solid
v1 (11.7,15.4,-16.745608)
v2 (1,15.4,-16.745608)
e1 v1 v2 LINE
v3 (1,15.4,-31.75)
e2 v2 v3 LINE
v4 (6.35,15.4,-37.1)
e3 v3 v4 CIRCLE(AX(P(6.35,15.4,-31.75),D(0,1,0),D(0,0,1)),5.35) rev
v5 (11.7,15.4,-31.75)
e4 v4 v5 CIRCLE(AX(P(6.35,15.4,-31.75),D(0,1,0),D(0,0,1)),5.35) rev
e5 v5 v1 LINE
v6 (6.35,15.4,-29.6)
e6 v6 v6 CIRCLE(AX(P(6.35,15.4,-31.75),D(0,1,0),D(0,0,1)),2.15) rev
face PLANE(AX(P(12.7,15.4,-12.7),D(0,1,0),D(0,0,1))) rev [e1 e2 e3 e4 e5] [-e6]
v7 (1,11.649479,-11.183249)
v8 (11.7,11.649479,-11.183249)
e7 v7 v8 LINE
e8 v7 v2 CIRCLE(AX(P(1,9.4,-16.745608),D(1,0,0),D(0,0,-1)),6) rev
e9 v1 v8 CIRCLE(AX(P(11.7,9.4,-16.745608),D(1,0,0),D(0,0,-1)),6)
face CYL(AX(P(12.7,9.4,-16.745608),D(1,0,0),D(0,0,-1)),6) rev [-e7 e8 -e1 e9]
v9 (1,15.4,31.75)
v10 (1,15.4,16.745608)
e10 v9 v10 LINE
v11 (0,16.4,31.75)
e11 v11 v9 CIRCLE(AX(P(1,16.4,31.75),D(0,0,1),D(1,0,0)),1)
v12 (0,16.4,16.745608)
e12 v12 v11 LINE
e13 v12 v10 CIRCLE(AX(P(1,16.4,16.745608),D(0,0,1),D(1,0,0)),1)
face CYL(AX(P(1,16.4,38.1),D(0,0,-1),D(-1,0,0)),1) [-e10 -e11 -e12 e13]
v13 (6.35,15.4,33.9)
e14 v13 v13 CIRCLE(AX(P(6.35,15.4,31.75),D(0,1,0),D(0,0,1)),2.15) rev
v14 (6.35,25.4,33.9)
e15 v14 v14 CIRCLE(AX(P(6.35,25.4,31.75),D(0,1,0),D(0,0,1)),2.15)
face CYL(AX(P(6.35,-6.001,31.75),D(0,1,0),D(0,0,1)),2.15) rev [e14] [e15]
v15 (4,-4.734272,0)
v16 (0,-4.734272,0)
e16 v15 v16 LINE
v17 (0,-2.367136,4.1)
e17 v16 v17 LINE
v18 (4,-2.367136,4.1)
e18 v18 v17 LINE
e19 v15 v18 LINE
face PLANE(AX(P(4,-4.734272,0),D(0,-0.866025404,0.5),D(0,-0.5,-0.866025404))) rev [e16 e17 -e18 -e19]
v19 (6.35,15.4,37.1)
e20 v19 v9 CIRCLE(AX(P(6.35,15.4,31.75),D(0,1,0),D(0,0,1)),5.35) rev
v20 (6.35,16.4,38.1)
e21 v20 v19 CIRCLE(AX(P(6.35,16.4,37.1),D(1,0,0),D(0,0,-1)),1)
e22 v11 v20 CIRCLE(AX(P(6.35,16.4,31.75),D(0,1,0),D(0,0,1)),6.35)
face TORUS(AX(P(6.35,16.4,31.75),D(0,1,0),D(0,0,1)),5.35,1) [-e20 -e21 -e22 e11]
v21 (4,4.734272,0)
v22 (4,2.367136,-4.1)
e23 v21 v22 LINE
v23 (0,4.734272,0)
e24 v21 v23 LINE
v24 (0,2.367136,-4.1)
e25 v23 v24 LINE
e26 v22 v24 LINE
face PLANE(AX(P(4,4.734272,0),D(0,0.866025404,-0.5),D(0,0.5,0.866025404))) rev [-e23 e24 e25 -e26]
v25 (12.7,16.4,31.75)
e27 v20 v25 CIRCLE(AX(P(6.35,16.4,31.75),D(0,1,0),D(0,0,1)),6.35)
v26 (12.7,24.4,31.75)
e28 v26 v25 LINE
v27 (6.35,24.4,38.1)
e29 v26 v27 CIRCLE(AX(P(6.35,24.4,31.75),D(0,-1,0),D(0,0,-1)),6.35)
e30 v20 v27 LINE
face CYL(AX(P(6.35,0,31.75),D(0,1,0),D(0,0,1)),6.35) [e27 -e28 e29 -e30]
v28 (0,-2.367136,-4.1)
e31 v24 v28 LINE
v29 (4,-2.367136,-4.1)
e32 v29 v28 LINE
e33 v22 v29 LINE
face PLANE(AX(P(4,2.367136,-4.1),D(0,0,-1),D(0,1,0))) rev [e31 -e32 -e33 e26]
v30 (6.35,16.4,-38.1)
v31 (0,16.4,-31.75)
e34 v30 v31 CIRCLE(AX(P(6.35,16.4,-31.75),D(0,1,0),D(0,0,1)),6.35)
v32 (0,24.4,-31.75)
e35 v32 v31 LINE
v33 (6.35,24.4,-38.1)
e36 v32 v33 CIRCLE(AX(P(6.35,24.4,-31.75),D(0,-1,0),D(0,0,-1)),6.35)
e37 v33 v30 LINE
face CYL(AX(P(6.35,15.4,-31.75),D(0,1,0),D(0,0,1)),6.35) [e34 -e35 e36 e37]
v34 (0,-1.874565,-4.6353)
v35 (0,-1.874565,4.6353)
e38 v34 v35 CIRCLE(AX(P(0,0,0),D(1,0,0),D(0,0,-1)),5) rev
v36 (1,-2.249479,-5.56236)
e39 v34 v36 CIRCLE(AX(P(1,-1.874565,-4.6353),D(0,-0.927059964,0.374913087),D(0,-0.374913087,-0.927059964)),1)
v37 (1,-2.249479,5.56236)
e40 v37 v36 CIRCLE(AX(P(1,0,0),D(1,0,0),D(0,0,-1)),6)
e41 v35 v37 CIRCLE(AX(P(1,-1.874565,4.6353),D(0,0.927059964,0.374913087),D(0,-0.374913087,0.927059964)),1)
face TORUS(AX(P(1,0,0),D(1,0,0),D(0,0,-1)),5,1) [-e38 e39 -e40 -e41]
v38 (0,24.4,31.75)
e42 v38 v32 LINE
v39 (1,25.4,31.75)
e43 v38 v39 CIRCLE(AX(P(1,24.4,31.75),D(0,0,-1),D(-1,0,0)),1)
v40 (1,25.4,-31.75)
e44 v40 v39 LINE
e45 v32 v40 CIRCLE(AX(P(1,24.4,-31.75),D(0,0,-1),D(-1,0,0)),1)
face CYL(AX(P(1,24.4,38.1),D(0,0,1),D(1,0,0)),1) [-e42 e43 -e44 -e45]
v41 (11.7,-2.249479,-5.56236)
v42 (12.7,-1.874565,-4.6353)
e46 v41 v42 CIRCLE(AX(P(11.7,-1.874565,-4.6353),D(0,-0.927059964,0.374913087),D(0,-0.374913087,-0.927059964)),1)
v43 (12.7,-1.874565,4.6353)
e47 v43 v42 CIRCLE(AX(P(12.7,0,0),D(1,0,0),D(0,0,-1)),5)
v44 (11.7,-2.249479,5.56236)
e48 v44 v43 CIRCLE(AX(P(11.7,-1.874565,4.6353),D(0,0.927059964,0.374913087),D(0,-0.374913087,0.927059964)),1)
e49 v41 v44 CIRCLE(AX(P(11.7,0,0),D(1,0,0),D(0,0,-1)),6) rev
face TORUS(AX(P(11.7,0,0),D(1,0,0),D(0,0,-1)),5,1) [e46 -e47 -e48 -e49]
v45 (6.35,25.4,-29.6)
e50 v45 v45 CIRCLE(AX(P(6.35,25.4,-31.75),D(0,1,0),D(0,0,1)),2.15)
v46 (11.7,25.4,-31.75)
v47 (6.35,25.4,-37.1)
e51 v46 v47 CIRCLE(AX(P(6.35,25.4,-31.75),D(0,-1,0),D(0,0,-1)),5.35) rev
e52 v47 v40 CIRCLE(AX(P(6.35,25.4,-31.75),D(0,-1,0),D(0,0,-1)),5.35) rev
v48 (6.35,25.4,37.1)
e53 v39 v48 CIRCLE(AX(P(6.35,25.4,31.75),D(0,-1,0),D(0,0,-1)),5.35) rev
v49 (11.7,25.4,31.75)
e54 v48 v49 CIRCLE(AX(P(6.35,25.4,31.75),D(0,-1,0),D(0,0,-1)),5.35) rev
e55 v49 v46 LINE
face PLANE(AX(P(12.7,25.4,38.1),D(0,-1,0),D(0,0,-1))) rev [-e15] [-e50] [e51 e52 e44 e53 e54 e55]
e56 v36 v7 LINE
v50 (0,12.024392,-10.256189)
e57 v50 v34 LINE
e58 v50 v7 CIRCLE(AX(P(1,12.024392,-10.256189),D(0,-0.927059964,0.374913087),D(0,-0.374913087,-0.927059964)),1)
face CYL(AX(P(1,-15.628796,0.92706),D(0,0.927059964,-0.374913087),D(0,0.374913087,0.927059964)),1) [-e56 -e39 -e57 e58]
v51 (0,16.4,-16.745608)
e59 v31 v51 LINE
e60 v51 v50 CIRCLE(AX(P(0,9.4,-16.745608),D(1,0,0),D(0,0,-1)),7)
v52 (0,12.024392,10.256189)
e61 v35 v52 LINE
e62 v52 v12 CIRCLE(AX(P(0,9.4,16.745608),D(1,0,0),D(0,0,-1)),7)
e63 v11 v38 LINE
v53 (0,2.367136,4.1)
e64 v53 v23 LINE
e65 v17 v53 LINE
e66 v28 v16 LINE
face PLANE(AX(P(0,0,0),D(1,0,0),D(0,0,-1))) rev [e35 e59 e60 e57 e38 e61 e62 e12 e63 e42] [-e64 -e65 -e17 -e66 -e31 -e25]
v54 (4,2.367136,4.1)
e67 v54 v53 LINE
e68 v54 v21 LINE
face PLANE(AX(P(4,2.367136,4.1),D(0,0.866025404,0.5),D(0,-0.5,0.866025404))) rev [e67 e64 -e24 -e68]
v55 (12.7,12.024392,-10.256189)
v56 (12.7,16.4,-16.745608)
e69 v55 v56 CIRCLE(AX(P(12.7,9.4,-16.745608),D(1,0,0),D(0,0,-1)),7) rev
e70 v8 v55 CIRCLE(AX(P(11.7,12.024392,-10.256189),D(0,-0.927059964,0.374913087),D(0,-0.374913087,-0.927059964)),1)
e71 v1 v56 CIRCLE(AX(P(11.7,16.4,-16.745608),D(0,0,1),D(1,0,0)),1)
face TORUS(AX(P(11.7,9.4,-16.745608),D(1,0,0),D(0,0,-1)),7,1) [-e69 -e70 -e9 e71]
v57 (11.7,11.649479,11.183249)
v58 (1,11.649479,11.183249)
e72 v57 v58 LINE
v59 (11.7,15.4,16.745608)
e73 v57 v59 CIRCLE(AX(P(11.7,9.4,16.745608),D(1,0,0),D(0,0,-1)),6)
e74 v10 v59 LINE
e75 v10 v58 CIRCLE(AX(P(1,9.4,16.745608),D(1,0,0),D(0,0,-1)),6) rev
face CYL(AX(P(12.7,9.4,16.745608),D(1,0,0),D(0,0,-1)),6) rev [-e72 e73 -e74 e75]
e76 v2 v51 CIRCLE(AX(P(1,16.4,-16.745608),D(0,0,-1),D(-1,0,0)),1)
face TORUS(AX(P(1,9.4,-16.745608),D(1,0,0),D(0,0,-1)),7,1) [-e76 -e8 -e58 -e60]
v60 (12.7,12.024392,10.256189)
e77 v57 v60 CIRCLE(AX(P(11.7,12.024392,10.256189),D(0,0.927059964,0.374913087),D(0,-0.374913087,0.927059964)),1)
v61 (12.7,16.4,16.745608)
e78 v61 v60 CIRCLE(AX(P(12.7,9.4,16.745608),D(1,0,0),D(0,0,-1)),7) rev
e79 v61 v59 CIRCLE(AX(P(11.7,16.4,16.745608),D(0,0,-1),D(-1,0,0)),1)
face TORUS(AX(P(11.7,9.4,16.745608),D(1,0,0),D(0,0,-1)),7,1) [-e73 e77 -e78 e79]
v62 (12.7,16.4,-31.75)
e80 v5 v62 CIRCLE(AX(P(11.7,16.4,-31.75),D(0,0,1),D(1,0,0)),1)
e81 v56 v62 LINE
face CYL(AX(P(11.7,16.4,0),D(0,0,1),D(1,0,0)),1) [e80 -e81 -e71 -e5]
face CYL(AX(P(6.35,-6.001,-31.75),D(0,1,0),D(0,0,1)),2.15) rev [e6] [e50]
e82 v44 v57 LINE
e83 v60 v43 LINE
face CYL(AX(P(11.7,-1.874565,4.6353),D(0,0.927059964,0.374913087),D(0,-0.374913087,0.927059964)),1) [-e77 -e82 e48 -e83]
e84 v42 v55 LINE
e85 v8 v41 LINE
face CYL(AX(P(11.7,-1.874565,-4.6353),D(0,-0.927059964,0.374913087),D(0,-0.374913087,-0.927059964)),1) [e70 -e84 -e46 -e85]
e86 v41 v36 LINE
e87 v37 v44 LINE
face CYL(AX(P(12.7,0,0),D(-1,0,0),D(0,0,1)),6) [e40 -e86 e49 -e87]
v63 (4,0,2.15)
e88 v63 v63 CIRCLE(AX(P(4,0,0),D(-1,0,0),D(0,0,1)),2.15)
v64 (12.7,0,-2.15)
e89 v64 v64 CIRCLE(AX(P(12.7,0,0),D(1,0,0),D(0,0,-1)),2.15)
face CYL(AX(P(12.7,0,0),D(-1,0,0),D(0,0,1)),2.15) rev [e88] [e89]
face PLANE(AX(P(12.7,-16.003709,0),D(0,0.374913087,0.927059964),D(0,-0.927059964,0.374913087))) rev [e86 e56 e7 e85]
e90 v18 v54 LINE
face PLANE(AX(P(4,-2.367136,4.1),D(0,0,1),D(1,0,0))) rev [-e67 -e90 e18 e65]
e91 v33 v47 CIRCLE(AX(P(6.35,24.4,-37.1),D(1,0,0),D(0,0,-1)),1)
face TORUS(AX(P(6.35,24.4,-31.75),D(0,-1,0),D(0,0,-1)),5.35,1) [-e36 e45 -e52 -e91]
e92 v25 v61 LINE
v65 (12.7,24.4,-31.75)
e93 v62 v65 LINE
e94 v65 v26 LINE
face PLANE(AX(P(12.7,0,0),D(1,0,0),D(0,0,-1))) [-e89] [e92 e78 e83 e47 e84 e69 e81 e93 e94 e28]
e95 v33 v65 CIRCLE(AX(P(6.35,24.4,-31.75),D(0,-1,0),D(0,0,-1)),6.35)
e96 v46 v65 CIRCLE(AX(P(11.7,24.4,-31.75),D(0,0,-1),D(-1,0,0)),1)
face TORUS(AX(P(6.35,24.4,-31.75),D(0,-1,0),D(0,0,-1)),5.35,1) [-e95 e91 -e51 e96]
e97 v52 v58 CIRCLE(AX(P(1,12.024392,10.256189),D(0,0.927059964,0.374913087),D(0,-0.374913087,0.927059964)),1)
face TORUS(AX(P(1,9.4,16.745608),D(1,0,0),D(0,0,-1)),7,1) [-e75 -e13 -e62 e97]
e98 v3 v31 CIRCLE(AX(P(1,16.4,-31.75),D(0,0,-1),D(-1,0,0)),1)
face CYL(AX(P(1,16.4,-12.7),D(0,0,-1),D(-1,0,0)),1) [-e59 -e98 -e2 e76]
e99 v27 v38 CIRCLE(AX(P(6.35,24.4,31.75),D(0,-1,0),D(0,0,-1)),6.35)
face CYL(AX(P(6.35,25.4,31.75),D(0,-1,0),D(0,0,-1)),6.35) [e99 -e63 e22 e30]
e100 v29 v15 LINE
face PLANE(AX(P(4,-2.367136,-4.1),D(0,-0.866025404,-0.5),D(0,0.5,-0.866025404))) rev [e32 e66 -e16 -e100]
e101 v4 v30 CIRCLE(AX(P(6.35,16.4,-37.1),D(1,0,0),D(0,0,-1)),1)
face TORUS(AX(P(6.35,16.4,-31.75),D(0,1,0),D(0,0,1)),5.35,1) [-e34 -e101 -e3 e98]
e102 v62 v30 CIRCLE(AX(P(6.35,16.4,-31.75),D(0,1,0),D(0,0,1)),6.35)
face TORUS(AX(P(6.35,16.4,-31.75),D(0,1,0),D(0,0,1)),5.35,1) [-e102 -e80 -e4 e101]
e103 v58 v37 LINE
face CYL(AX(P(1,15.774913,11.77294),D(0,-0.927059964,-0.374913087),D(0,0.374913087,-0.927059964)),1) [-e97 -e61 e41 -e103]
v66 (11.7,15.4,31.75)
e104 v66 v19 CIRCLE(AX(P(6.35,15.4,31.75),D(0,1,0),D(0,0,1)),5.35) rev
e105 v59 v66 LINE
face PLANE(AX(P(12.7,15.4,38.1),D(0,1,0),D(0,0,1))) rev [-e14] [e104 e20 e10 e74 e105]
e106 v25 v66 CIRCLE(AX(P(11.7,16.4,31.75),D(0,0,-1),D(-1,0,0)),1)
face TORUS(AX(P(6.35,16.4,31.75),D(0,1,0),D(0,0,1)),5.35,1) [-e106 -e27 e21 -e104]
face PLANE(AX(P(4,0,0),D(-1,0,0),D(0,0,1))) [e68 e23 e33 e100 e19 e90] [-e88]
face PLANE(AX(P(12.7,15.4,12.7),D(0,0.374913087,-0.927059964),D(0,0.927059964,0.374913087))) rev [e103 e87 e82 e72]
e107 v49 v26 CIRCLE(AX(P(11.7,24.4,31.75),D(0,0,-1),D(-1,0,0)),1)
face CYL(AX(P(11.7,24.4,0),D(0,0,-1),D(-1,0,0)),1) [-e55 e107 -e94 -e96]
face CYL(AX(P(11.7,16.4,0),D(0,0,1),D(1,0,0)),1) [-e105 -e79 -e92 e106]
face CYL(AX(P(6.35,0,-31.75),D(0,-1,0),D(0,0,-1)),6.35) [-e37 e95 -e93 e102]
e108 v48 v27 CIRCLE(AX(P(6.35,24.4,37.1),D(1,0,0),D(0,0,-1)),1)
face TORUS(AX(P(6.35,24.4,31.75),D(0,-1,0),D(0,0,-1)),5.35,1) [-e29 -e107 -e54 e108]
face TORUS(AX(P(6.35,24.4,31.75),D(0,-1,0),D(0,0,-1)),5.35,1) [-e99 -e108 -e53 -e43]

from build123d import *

# Parameters (mm, degrees)
SKETCH1_R           = 2.15
BOSS_EXTRUDE1_DEPTH = 12.7
FILLET1_R           = 6
FILLET2_R           = 6.35
CUT_EXTRUDE1_REACH  = 52.979
SKETCH2_R           = 2.15
CUT_EXTRUDE2_DEPTH  = 4
FILLET3_R           = 1


with BuildPart() as part:
    # Sketch1 → Boss-Extrude1 (new body)
    with BuildSketch(Plane(origin=(0, 0, 0), x_dir=(0, 0, -1), z_dir=(1, 0, 0))):
        Polygon((-38.1, 25.4), (38.1, 25.4), (38.1, 15.4), (12.7, 15.4), (0, -16.003709137), (-12.7, 15.4), (-38.1, 15.4), align=None)
        Circle(SKETCH1_R, mode=Mode.SUBTRACT)
    extrude(amount=BOSS_EXTRUDE1_DEPTH)

    # Fillet1
    fillet1_edges = [part.edges().sort_by_distance(p)[0] for p in [
        (6.35, 15.4, -12.7),
        (6.35, -16.003709137, 0),
        (6.35, 15.4, 12.7),
    ]]
    fillet(fillet1_edges, radius=FILLET1_R)

    # Fillet2
    fillet2_edges = [part.edges().sort_by_distance(p)[0] for p in [
        (0, 20.4, -38.1),
        (12.7, 20.4, -38.1),
        (0, 20.4, 38.1),
        (12.7, 20.4, 38.1),
    ]]
    fillet(fillet2_edges, radius=FILLET2_R - 0.0001)  # a hair under: the kernel refuses the full size

    # Sketch2 → Cut-Extrude1 (cut, up to next)
    with BuildSketch(Plane(origin=(0, 25.4, 0), x_dir=(1, 0, 0), z_dir=(0, 1, 0)), mode=Mode.PRIVATE) as cut_extrude1_sk1:
        with Locations(Location((6.35, -31.75, 0), (0, 0, 270))):
            Circle(SKETCH2_R)
    cut_extrude1_tool1 = extrude(cut_extrude1_sk1.sketch, amount=-CUT_EXTRUDE1_REACH, mode=Mode.PRIVATE) & part.part
    # Sketch2 → Cut-Extrude1 (cut, up to next)
    with BuildSketch(Plane(origin=(0, 25.4, 0), x_dir=(1, 0, 0), z_dir=(0, 1, 0)), mode=Mode.PRIVATE) as cut_extrude1_sk2:
        with Locations(Location((6.35, 31.75, 0), (0, 0, 270))):
            Circle(SKETCH2_R)
    cut_extrude1_tool2 = extrude(cut_extrude1_sk2.sketch, amount=-CUT_EXTRUDE1_REACH, mode=Mode.PRIVATE) & part.part
    add(cut_extrude1_tool1.solids().sort_by_distance((6.35, 25.4, 31.75))[0], mode=Mode.SUBTRACT)
    add(cut_extrude1_tool2.solids().sort_by_distance((6.35, 25.4, -31.75))[0], mode=Mode.SUBTRACT)

    # Sketch3 → Cut-Extrude2 (cut)
    with BuildSketch(Plane.ZY):
        Polygon((0, 4.734272207), (-4.1, 2.367136104), (-4.1, -2.367136104), (0, -4.734272207), (4.1, -2.367136104), (4.1, 2.367136104), align=None)
    extrude(amount=-CUT_EXTRUDE2_DEPTH, mode=Mode.SUBTRACT)

    # Fillet3
    fillet3_edges = [part.edges().sort_by_distance(p)[0] for p in [
        (0, 15.4, -24.247854145),
        (12.7, 15.4, -24.247854145),
        (0, 4.7, -8.372804145),
        (12.7, 4.7, -8.372804145),
        (0, 4.7, 8.372804145),
        (12.7, 4.7, 8.372804145),
        (0, -6, 0),
        (12.7, -6, 0),
        (0, 14.374779952, -13.391273121),
        (12.7, 14.374779952, -13.391273121),
        (0, 14.374779952, 13.391273121),
        (12.7, 14.374779952, 13.391273121),
        (0, 25.4, 0),
        (12.7, 25.4, 0),
        (10.84015735, 25.4, 36.24015735),
        (1.85984265, 25.4, 36.24015735),
        (10.84015735, 25.4, -36.24015735),
        (1.85984265, 25.4, -36.24015735),
        (0, 15.4, 24.247854145),
        (10.84015735, 15.4, -36.24015735),
        (1.85984265, 15.4, -36.24015735),
        (12.7, 15.4, 24.247854145),
        (10.84015735, 15.4, 36.24015735),
        (1.85984265, 15.4, 36.24015735),
    ]]
    fillet(fillet3_edges, radius=FILLET3_R)


solid = part.part
